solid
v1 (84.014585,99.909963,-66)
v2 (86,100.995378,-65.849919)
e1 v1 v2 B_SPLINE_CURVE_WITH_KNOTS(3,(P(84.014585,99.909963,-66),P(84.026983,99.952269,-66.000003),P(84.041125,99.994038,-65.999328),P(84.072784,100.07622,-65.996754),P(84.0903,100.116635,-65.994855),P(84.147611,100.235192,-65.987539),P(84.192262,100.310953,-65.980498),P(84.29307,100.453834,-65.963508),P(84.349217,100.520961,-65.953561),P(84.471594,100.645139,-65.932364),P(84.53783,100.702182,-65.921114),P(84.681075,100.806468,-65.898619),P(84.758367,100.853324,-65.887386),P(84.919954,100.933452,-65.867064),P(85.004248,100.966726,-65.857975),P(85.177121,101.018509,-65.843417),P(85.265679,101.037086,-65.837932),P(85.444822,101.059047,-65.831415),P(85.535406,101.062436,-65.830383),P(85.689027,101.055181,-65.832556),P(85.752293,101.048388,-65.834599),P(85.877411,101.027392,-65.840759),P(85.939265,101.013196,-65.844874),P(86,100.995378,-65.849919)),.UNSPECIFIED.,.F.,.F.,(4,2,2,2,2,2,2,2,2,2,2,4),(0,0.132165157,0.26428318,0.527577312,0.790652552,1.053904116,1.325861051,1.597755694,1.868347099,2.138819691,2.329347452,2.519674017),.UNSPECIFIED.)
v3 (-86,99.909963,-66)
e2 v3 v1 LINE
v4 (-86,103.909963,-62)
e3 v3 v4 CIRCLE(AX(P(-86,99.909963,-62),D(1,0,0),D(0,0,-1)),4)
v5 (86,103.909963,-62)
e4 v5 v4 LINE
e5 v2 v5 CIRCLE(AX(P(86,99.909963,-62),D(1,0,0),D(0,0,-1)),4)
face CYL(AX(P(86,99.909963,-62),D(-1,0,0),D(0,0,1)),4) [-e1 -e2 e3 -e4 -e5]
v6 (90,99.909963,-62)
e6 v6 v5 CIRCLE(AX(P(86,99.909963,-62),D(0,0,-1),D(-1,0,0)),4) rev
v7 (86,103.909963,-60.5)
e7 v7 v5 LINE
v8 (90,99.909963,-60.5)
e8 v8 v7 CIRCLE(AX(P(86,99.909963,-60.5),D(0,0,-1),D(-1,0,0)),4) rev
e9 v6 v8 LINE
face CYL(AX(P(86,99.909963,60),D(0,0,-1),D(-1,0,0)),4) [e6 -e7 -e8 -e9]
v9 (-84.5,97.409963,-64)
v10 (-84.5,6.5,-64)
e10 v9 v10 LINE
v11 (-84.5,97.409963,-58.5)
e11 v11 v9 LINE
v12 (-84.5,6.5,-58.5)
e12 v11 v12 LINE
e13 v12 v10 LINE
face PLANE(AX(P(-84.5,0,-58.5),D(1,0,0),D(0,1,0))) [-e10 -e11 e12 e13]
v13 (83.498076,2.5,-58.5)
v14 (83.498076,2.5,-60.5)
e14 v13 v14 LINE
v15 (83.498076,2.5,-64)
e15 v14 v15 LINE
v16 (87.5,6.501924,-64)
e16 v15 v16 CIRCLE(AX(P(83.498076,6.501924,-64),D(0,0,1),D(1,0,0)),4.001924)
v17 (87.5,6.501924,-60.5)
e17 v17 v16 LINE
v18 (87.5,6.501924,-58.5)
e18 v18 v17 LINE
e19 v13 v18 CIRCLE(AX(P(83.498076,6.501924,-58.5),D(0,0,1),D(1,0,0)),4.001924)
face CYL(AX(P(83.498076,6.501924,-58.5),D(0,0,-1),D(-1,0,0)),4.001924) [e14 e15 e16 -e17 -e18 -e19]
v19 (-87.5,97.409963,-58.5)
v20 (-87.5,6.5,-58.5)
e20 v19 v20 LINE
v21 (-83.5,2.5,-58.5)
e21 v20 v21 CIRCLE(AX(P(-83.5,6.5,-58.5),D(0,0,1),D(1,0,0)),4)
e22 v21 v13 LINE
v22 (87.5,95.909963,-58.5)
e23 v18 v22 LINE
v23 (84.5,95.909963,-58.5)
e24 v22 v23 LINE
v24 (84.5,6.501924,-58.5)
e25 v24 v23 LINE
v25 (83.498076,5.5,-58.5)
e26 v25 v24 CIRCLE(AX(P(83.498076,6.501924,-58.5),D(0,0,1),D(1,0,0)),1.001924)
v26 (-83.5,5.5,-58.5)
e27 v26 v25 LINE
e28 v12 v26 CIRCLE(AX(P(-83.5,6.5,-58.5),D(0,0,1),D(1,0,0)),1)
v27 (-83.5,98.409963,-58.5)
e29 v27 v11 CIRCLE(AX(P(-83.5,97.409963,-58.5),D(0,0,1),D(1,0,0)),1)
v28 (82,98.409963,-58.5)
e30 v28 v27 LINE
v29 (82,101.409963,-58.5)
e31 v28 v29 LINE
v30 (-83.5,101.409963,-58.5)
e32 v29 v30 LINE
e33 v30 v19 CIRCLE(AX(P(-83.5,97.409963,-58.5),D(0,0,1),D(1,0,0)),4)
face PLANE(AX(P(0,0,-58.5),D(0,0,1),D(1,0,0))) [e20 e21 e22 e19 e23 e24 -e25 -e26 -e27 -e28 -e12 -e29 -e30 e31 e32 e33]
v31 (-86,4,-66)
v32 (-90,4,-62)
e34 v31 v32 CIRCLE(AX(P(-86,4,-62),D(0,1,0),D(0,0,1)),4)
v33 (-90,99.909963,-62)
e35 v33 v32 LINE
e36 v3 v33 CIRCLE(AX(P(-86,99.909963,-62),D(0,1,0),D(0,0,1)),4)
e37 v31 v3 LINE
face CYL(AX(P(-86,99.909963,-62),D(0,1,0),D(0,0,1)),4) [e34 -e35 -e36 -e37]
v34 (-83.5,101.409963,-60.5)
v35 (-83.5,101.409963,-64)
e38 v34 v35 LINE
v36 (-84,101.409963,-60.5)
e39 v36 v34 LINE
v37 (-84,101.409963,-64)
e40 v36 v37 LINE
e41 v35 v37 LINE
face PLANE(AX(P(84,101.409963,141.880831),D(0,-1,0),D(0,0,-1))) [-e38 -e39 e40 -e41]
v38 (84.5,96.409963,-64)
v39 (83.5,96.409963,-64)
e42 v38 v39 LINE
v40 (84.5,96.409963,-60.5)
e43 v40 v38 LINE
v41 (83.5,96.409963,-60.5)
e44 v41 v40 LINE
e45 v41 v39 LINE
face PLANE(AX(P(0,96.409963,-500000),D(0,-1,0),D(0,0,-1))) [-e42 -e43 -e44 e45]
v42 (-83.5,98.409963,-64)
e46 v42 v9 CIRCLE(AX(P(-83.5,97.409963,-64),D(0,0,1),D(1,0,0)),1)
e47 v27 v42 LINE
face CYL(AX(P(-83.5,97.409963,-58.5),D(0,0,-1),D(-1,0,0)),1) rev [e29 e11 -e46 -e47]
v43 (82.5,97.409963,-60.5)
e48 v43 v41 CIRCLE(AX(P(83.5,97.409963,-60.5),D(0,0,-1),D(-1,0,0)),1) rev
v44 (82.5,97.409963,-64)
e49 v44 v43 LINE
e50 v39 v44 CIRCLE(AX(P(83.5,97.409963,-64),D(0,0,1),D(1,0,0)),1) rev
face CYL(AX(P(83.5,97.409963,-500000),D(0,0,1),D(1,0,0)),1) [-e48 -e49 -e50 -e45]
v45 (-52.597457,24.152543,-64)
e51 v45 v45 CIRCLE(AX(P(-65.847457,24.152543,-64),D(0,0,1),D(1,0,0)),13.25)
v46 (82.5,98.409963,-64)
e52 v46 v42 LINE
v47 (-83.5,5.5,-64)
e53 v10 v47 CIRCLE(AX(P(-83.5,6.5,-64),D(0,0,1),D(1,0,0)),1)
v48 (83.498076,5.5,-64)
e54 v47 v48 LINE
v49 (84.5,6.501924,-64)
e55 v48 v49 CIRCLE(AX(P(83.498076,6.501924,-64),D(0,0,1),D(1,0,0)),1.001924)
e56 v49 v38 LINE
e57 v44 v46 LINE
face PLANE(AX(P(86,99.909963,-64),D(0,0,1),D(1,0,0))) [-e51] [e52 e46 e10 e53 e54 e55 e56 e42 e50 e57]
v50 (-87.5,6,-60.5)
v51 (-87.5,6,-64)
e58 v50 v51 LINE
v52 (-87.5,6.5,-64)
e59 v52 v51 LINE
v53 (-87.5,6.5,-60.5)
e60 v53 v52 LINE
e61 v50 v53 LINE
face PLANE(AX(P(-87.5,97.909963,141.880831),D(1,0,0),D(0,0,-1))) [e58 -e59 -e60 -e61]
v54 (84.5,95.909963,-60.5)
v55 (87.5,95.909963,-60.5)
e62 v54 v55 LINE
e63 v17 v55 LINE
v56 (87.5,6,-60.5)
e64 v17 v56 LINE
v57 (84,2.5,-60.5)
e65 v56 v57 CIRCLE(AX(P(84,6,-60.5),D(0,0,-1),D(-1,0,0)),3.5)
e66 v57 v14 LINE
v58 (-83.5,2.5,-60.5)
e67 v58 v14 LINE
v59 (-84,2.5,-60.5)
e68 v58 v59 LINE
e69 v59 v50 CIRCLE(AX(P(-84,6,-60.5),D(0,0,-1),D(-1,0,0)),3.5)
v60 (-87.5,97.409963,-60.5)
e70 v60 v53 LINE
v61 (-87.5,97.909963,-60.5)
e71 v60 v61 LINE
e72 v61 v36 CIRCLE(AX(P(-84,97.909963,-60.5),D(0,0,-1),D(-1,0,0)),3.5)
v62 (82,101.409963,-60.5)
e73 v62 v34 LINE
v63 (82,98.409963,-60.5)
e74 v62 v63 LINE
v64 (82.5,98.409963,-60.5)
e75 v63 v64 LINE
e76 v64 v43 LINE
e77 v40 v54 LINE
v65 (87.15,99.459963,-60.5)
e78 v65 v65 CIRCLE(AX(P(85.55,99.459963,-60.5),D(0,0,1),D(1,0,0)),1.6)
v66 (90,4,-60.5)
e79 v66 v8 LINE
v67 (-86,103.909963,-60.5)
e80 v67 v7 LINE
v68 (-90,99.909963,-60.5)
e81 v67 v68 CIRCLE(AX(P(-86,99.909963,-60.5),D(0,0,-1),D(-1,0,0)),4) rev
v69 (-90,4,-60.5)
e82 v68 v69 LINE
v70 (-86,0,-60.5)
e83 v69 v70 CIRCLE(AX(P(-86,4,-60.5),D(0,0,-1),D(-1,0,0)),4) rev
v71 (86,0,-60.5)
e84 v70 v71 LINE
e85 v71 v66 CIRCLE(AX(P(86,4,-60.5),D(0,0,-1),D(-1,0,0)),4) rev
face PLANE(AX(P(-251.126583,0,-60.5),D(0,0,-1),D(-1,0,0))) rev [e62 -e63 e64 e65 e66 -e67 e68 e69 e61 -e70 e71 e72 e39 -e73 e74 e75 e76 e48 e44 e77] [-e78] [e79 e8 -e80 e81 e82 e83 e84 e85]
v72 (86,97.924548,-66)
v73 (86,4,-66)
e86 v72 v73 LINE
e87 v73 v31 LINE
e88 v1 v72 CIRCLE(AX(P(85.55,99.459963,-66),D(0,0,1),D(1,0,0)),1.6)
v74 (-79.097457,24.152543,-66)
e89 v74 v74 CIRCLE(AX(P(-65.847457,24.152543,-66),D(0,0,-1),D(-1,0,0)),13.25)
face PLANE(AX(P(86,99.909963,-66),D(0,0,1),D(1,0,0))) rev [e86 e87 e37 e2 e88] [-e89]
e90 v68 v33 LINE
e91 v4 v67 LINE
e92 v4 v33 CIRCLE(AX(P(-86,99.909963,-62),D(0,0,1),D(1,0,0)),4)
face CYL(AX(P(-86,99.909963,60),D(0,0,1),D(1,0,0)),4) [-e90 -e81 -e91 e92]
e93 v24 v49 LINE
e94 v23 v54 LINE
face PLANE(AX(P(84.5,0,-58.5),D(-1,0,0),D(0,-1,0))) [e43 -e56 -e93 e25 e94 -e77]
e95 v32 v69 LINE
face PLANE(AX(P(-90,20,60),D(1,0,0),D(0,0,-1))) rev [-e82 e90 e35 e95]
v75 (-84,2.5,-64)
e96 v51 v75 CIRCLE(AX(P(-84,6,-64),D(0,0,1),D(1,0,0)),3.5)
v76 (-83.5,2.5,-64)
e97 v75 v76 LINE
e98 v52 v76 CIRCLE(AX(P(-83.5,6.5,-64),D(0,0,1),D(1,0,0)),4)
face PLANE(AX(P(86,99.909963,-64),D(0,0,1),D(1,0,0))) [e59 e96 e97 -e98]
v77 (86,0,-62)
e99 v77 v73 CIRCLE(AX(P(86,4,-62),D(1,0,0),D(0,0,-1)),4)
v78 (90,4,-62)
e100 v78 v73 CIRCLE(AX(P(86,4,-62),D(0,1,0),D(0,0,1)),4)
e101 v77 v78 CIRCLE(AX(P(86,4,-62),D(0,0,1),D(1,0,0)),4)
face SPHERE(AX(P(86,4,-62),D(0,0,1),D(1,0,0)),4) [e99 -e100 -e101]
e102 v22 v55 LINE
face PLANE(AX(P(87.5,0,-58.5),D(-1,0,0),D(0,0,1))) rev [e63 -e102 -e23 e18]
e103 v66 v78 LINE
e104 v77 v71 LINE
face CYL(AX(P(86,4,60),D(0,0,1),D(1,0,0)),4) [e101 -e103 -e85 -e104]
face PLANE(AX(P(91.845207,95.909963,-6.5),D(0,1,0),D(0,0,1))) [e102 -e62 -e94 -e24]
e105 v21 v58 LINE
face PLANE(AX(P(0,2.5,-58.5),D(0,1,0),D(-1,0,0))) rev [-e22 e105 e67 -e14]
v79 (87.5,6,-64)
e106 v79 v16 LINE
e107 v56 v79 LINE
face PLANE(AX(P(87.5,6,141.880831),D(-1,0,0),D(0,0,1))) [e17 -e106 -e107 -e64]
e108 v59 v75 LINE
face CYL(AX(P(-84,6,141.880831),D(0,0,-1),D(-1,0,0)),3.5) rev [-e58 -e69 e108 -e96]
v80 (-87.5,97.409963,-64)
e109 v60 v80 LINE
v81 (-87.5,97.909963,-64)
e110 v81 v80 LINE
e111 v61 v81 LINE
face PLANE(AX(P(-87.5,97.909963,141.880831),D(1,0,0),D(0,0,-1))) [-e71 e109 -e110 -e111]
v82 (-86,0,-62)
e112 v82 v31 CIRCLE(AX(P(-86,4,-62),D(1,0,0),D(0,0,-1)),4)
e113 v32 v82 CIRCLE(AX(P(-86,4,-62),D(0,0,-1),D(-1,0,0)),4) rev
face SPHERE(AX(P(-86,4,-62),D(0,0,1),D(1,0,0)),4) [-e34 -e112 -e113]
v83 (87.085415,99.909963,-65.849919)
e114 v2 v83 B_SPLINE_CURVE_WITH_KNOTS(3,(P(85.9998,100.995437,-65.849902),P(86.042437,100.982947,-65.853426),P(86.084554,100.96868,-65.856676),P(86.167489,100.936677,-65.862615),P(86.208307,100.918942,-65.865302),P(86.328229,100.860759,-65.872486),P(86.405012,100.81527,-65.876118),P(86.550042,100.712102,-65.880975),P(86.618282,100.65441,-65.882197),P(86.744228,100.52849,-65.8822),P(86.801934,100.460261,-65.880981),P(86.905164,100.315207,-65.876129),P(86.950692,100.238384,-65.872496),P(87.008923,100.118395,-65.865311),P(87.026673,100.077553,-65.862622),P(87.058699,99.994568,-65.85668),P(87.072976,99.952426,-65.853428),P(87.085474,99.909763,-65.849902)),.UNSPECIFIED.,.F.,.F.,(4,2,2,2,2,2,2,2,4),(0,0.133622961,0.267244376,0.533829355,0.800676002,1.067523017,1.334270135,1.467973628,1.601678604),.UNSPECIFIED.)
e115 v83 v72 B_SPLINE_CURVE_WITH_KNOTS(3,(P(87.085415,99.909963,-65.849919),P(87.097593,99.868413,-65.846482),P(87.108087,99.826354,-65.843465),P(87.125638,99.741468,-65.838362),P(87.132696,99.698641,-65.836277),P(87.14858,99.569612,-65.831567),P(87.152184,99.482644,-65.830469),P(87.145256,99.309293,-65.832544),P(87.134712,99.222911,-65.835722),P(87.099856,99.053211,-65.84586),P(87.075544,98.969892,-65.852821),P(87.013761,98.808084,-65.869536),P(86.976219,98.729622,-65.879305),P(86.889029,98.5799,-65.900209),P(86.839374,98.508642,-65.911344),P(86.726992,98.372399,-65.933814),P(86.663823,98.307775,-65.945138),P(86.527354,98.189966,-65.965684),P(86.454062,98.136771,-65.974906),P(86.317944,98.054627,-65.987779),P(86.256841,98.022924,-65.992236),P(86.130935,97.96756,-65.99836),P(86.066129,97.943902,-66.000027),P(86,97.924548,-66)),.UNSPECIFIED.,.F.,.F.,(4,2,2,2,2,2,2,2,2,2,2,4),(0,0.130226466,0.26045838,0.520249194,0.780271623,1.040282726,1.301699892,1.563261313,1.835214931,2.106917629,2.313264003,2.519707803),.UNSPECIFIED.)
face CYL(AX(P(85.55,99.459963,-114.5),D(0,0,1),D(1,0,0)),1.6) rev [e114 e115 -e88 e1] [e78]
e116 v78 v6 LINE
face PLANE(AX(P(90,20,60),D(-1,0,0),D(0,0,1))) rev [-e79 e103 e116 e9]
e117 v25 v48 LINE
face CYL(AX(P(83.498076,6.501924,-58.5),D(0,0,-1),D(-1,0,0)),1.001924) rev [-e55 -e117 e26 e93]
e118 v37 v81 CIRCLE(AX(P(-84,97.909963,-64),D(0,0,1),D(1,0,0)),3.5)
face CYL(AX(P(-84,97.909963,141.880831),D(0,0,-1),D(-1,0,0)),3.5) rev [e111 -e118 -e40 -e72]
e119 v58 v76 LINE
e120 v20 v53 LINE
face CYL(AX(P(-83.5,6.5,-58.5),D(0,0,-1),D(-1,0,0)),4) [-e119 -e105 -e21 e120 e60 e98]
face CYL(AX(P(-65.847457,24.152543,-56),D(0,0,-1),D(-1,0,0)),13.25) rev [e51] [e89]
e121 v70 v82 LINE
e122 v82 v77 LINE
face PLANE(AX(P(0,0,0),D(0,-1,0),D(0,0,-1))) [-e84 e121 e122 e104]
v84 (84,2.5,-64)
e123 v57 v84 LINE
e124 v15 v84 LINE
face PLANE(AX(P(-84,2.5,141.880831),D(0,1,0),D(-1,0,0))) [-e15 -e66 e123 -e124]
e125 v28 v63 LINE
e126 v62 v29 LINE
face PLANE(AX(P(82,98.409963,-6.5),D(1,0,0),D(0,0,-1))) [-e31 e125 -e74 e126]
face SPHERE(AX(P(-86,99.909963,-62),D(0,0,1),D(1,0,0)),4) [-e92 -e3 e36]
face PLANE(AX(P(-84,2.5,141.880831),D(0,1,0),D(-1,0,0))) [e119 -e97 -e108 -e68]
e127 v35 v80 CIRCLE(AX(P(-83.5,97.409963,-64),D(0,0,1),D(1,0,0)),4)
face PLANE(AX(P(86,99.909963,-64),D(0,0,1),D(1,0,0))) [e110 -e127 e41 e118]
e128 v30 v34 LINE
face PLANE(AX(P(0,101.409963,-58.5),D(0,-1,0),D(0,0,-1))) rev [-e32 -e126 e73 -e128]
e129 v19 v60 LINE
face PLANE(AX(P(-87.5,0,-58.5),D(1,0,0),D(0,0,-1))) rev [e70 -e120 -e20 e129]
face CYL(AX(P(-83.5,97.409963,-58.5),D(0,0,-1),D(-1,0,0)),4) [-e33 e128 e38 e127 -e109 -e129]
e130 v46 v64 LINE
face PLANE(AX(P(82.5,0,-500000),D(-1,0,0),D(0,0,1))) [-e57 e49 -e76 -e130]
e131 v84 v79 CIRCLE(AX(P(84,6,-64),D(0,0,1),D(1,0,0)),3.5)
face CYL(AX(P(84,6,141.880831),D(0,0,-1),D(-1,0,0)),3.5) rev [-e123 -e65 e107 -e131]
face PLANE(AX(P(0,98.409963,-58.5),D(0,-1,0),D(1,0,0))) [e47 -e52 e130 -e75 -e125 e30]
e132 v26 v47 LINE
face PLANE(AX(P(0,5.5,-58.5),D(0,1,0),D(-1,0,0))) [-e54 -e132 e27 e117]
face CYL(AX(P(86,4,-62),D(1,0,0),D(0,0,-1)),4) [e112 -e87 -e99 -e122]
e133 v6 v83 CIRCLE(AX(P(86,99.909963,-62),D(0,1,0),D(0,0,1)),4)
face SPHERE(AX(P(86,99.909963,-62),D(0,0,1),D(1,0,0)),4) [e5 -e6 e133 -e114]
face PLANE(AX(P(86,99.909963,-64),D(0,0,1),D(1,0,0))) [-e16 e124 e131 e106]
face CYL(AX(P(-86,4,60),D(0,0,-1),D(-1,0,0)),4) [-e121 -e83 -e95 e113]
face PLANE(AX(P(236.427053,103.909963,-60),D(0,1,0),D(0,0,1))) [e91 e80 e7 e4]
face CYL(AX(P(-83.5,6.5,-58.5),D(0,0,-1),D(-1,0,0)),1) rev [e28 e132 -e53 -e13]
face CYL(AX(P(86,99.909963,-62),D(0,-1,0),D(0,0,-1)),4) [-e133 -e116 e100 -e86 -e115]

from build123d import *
from OCP.BRepFilletAPI import BRepFilletAPI_MakeChamfer

# Parameters (mm, degrees)
SKETCH1_W            = 180
SKETCH1_H            = 120
BOSS_EXTRUDE1_DEPTH  = 20
BOSS_EXTRUDE2_DEPTH  = 180
SHELL3_T             = -2
FILLET1_R            = 4
FILLET2_R            = 4
BOSS_EXTRUDE3_DEPTH  = 2.5
SKETCH14_R           = 1.6
CUT_EXTRUDE10_DEPTH  = 3.2
CUT_EXTRUDE3_REACH   = 151.991
SKETCH7_W            = 14
SKETCH7_H            = 9
SKETCH8_R            = 1.35
BOSS_EXTRUDE4_DEPTH  = 5
SKETCH8_3_W          = 97.5
SKETCH8_3_H          = 40.5
CUT_EXTRUDE4_DEPTH   = 5
SKETCH9_W            = 50.8
SKETCH9_H            = 19.5
CUT_EXTRUDE5_DEPTH   = 5
SKETCH10_R           = 2.525
CUT_EXTRUDE6_DEPTH   = 5
SKETCH11_R           = 6.125
CUT_EXTRUDE7_DEPTH   = 5
CUT_EXTRUDE8_DEPTH   = 5
FILLET4_R            = 1.5
SKETCH13_W           = 22
SKETCH13_H           = 10
CUT_EXTRUDE9_DEPTH   = 5
CHAMFER1_SIZE        = 9.330127019
CHAMFER1_SIZE_2      = 2.5
SKETCH15_W           = 9
SKETCH15_H           = 14
CUT_EXTRUDE11_DEPTH  = 3.2
SKETCH16_R           = 3.5
CUT_EXTRUDE12_DEPTH  = 3.2
SKETCH17_R           = 7
SKETCH17_R_2         = 6
BOSS_EXTRUDE5_DEPTH  = 0.5
FILLET7_R            = 0.5
CUT_EXTRUDE13_DEPTH  = 1
FILLET8_R            = 1
SKETCH19_W           = 7.5
SKETCH19_H           = 5.2
SKETCH19_W_2         = 6.5
SKETCH19_H_2         = 6.5
CUT_EXTRUDE14_DEPTH  = 1.2
BOSS_EXTRUDE6_START  = 4
BOSS_EXTRUDE6_DEPTH  = 4
BOSS_EXTRUDE7_START  = 2
BOSS_EXTRUDE7_DEPTH  = 2
FILLET9_R            = 4
CUT_EXTRUDE18_REACH  = 220.067
BOSS_EXTRUDE8_DEPTH  = 3.5
BOSS_EXTRUDE10_DEPTH = 5.5
BOSS_EXTRUDE12_START = -3.5
BOSS_EXTRUDE12_DEPTH = 3.5
CUT_EXTRUDE21_DEPTH  = 54
SKETCH31_R           = 1.6
CUT_EXTRUDE22_DEPTH  = 54
FILLET11_R           = 1
SKETCH32_R           = 13.25
CUT_EXTRUDE23_DEPTH  = 10


# Read off the part's stored shape, not the designer's step: Boss-Extrude12
with BuildPart() as part:
    # Sketch1 → Boss-Extrude1 (new body)
    with BuildSketch(Plane(origin=(0, 0, 0), x_dir=(1, 0, 0), z_dir=(0, 1, 0))):
        Rectangle(SKETCH1_W, SKETCH1_H)
    extrude(amount=BOSS_EXTRUDE1_DEPTH)

    # Sketch2 → Boss-Extrude2 (add)
    with BuildSketch(Plane.ZY.offset(90)):
        Polygon((60, 20), (-40, 103.909963118), (-60, 103.909963118), (-60, 20), align=None)
    extrude(amount=-BOSS_EXTRUDE2_DEPTH)

    # Shell3
    shell3_openings = [part.faces().sort_by_distance(p)[0] for p in [
        (0, 51.954981559, -60),
    ]]
    offset(amount=SHELL3_T, openings=shell3_openings, kind=Kind.INTERSECTION)

    # Fillet1
    fillet1_edges = [part.edges().sort_by_distance(p)[0] for p in [
        (0, 20, 60),
        (0, 103.909963118, -40),
        (-90, 61.954981559, 10),
        (-90, 103.909963118, -50),
        (90, 103.909963118, -50),
        (90, 61.954981559, 10),
        (0, 0, 60),
        (-90, 0, 0),
        (90, 0, 0),
        (90, 10, 60),
        (-90, 10, 60),
    ]]
    fillet(fillet1_edges, radius=FILLET1_R)

    # Fillet2
    fillet2_edges = [part.edges().sort_by_distance(p)[0] for p in [
        (88, 2, -1),
        (88, 101.909963118, -50.363970234),
        (88, 60.488673901, 8.636029766),
        (88, 10.533692342, 58),
        (-88, 2, -1),
        (-88, 60.488673901, 8.636029766),
        (-88, 101.909963118, -50.363970234),
        (0, 2, 58),
        (-88, 10.533692342, 58),
        (0, 101.909963118, -40.727940469),
        (0, 19.067384684, 58),
    ]]
    fillet(fillet2_edges, radius=FILLET2_R)

    # Sketch4 → Boss-Extrude3 (add)
    with BuildSketch(Plane(origin=(0, 2, 0), x_dir=(1, 0, 0), z_dir=(0, 1, 0))):
        Polygon((34.175426481, -3.50047313), (32.58771324, -0.75047313), (29.41228676, -0.75047313), (27.824573519, -3.50047313), (29.41228676, -6.25047313), (32.58771324, -6.25047313), align=None)
        Polygon((32.58771324, 41.24952687), (34.175426481, 38.49952687), (32.58771324, 35.74952687), (29.41228676, 35.74952687), (27.824573519, 38.49952687), (29.41228676, 41.24952687), align=None)
        Polygon((-29.41228676, 41.24952687), (-32.58771324, 41.24952687), (-34.175426481, 38.49952687), (-32.58771324, 35.74952687), (-29.41228676, 35.74952687), (-27.824573519, 38.49952687), align=None)
        Polygon((-32.58771324, -6.25047313), (-34.175426481, -3.50047313), (-32.58771324, -0.75047313), (-29.41228676, -0.75047313), (-27.824573519, -3.50047313), (-29.41228676, -6.25047313), align=None)
    extrude(amount=BOSS_EXTRUDE3_DEPTH)

    # Sketch14 → Cut-Extrude10 (cut)
    with BuildSketch(Plane(origin=(0, 4.5, 0), x_dir=(1, 0, 0), z_dir=(0, 1, 0))):
        with Locations(Location((31, 38.49952687, 0), (0, 0, 270))):
            Circle(SKETCH14_R)
        with Locations(Location((-31, -3.50047313, 0), (0, 0, 90))):
            Circle(SKETCH14_R)
        with Locations(Location((-31, 38.49952687, 0), (0, 0, 270))):
            Circle(SKETCH14_R)
        with Locations(Location((31, -3.50047313, 0), (0, 0, 270))):
            Circle(SKETCH14_R)
    extrude(amount=-CUT_EXTRUDE10_DEPTH, mode=Mode.SUBTRACT)

    # Sketch7 → Cut-Extrude3 (cut, up to next)
    with BuildSketch(Plane(origin=(0, 103.909963118, 0), x_dir=(1, 0, 0), z_dir=(0, 1, 0)), mode=Mode.PRIVATE) as cut_extrude3_sk1:
        with Locations((-63, 50.727940469)):
            Rectangle(SKETCH7_W, SKETCH7_H)
    cut_extrude3_tool1 = extrude(cut_extrude3_sk1.sketch, amount=-CUT_EXTRUDE3_REACH, mode=Mode.PRIVATE) & part.part
    add(cut_extrude3_tool1.solids().sort_by_distance((-63, 103.909963, -50.72794))[0], mode=Mode.SUBTRACT)

    # Sketch8 → Boss-Extrude4 (add)
    with BuildSketch(Plane(origin=(0, 41.280714367, 34.6386322), x_dir=(1, 0, 0), z_dir=(0, 0.766044443118982, 0.6427876096865347))):
        with Locations(Location((-73.5, 93.477933603, 0), (0, 0, 270))):
            Circle(SKETCH8_R)
        with Locations(Location((-73.5, 37.977933603, 0), (0, 0, 270))):
            Circle(SKETCH8_R)
        with Locations(Location((19, 37.977933603, 0), (0, 0, 270))):
            Circle(SKETCH8_R)
        with Locations(Location((19, 93.477933603, 0), (0, 0, 270))):
            Circle(SKETCH8_R)
    extrude(amount=-BOSS_EXTRUDE4_DEPTH)

    # Sketch8<3> → Cut-Extrude4 (cut)
    with BuildSketch(Plane(origin=(0, 41.280714367, 34.6386322), x_dir=(1, 0, 0), z_dir=(0, 0.766044443118982, 0.6427876096865347))):
        with Locations((-27.25, 65.727933603)):
            Rectangle(SKETCH8_3_W, SKETCH8_3_H)
    extrude(amount=-CUT_EXTRUDE4_DEPTH, mode=Mode.SUBTRACT)

    # Sketch9 → Cut-Extrude5 (cut)
    with BuildSketch(Plane(origin=(0, 41.280714367, 34.6386322), x_dir=(1, 0, 0), z_dir=(0, 0.766044443118982, 0.6427876096865347))):
        with Locations((-50.6, 20.727933603)):
            Rectangle(SKETCH9_W, SKETCH9_H)
    extrude(amount=-CUT_EXTRUDE5_DEPTH, mode=Mode.SUBTRACT)

    # Sketch10 → Cut-Extrude6 (cut)
    with BuildSketch(Plane(origin=(0, 41.280714367, 34.6386322), x_dir=(1, 0, 0), z_dir=(0, 0.766044443118982, 0.6427876096865347))):
        with Locations(Location((-13.525, 20.727933603, 0), (0, 0, 270))):
            Circle(SKETCH10_R)
        with Locations(Location((-1.85, 20.727933603, 0), (0, 0, 270))):
            Circle(SKETCH10_R)
        with Locations(Location((9.825, 20.727933603, 0), (0, 0, 270))):
            Circle(SKETCH10_R)
    extrude(amount=-CUT_EXTRUDE6_DEPTH, mode=Mode.SUBTRACT)

    # Sketch11 → Cut-Extrude7 (cut)
    with BuildSketch(Plane(origin=(0, 41.280714367, 34.6386322), x_dir=(1, 0, 0), z_dir=(0, 0.766044443118982, 0.6427876096865347))):
        with Locations(Location((37.625, 60.977933603, 0), (0, 0, 270))):
            Circle(SKETCH11_R)
        with BuildLine():
            ThreePointArc((76, 60.977933603), (74.206029035, 65.308962638), (69.875, 67.102933603))
            Line((69.875, 67.102933603), (69.875, 54.852933603))
            ThreePointArc((69.875, 54.852933603), (74.206029035, 56.646904568), (76, 60.977933603))
        make_face()
        with BuildLine():
            Line((69.875, 54.852933603), (69.875, 67.102933603))
            ThreePointArc((69.875, 67.102933603), (63.75, 60.977933603), (69.875, 54.852933603))
        make_face()
    extrude(amount=-CUT_EXTRUDE7_DEPTH, mode=Mode.SUBTRACT)

    # Sketch12 → Cut-Extrude8 (cut)
    with BuildSketch(Plane(origin=(0, 41.280714367, 34.6386322), x_dir=(1, 0, 0), z_dir=(0, 0.766044443118982, 0.6427876096865347))):
        with BuildLine():
            ThreePointArc((-76, -10.131875079), (-66, -20.131875079), (-56, -10.131875079))
            Line((-56, -10.131875079), (-76, -10.131875079))
        make_face()
        with BuildLine():
            Line((-76, -10.131875079), (-56, -10.131875079))
            ThreePointArc((-56, -10.131875079), (-66, -0.131875079), (-76, -10.131875079))
        make_face()
        with BuildLine():
            ThreePointArc((-25.2, -10.131875079), (-35.2, -0.131875079), (-45.2, -10.131875079))
            Line((-45.2, -10.131875079), (-25.2, -10.131875079))
        make_face()
        with BuildLine():
            Line((-25.2, -10.131875079), (-45.2, -10.131875079))
            ThreePointArc((-45.2, -10.131875079), (-35.2, -20.131875079), (-25.2, -10.131875079))
        make_face()
    extrude(amount=-CUT_EXTRUDE8_DEPTH, mode=Mode.SUBTRACT)

    # Fillet4
    fillet4_edges = [part.edges().sort_by_distance(p)[0] for p in [
        (-45.2, 33.235981717, 41.114523583),
        (-76, 33.235981717, 41.114523583),
    ]]
    fillet(fillet4_edges, radius=FILLET4_R)

    # Sketch13 → Cut-Extrude9 (cut)
    with BuildSketch(Plane(origin=(0, 41.280714367, 34.6386322), x_dir=(1, 0, 0), z_dir=(0, 0.766044443118982, 0.6427876096865347))):
        with Locations((-1.85, -0.131875079)):
            Rectangle(SKETCH13_W, SKETCH13_H)
        with Locations((-1.85, -20.131875079)):
            Rectangle(SKETCH13_W, SKETCH13_H)
    extrude(amount=-CUT_EXTRUDE9_DEPTH, mode=Mode.SUBTRACT)

    # Chamfer1
    chamfer1_edges_1 = [part.edges().sort_by_distance(p)[0] for p in [
        (-28.61843014, 2, 4.87547313),
    ]]
    chamfer1_side_1 = [part.faces().sort_by_distance(p)[0] for p in [
        (-28.575128869, 2, 4.90047313),
    ]]
    chamfer1_edges_2 = [part.edges().sort_by_distance(p)[0] for p in [
        (-31, 2, 6.25047313),
    ]]
    chamfer1_side_2 = [part.faces().sort_by_distance(p)[0] for p in [
        (-31, 2, 6.30047313),
    ]]
    chamfer1_edges_3 = [part.edges().sort_by_distance(p)[0] for p in [
        (-33.38156986, 2, 4.87547313),
    ]]
    chamfer1_side_3 = [part.faces().sort_by_distance(p)[0] for p in [
        (-33.424871131, 2, 4.90047313),
    ]]
    chamfer1_edges_4 = [part.edges().sort_by_distance(p)[0] for p in [
        (-33.38156986, 2, -37.12452687),
    ]]
    chamfer1_side_4 = [part.faces().sort_by_distance(p)[0] for p in [
        (-33.424871131, 2, -37.09952687),
    ]]
    chamfer1_edges_5 = [part.edges().sort_by_distance(p)[0] for p in [
        (-31, 2, -35.74952687),
    ]]
    chamfer1_side_5 = [part.faces().sort_by_distance(p)[0] for p in [
        (-31, 2, -35.69952687),
    ]]
    chamfer1_edges_6 = [part.edges().sort_by_distance(p)[0] for p in [
        (-28.61843014, 2, -37.12452687),
    ]]
    chamfer1_side_6 = [part.faces().sort_by_distance(p)[0] for p in [
        (-28.575128869, 2, -37.09952687),
    ]]
    chamfer1_edges_7 = [part.edges().sort_by_distance(p)[0] for p in [
        (28.61843014, 2, -37.12452687),
    ]]
    chamfer1_side_7 = [part.faces().sort_by_distance(p)[0] for p in [
        (28.575128869, 2, -37.09952687),
    ]]
    chamfer1_edges_8 = [part.edges().sort_by_distance(p)[0] for p in [
        (31, 2, -35.74952687),
    ]]
    chamfer1_side_8 = [part.faces().sort_by_distance(p)[0] for p in [
        (31, 2, -35.69952687),
    ]]
    chamfer1_edges_9 = [part.edges().sort_by_distance(p)[0] for p in [
        (33.38156986, 2, -37.12452687),
    ]]
    chamfer1_side_9 = [part.faces().sort_by_distance(p)[0] for p in [
        (33.424871131, 2, -37.09952687),
    ]]
    chamfer1_edges_10 = [part.edges().sort_by_distance(p)[0] for p in [
        (33.38156986, 2, 4.87547313),
    ]]
    chamfer1_side_10 = [part.faces().sort_by_distance(p)[0] for p in [
        (33.424871131, 2, 4.90047313),
    ]]
    chamfer1_edges_11 = [part.edges().sort_by_distance(p)[0] for p in [
        (28.61843014, 2, 4.87547313),
    ]]
    chamfer1_side_11 = [part.faces().sort_by_distance(p)[0] for p in [
        (28.575128869, 2, 4.90047313),
    ]]
    chamfer1_edges_12 = [part.edges().sort_by_distance(p)[0] for p in [
        (31, 2, 6.25047313),
    ]]
    chamfer1_side_12 = [part.faces().sort_by_distance(p)[0] for p in [
        (31, 2, 6.30047313),
    ]]
    chamfer1 = BRepFilletAPI_MakeChamfer(part.part.solid().wrapped)
    for e in chamfer1_edges_1:
        chamfer1.Add(CHAMFER1_SIZE - 0.0001, CHAMFER1_SIZE_2 - 0.0001, e.wrapped, chamfer1_side_1[0].wrapped)
    for e in chamfer1_edges_2:
        chamfer1.Add(CHAMFER1_SIZE - 0.0001, CHAMFER1_SIZE_2 - 0.0001, e.wrapped, chamfer1_side_2[0].wrapped)
    for e in chamfer1_edges_3:
        chamfer1.Add(CHAMFER1_SIZE - 0.0001, CHAMFER1_SIZE_2 - 0.0001, e.wrapped, chamfer1_side_3[0].wrapped)
    for e in chamfer1_edges_4:
        chamfer1.Add(CHAMFER1_SIZE - 0.0001, CHAMFER1_SIZE_2 - 0.0001, e.wrapped, chamfer1_side_4[0].wrapped)
    for e in chamfer1_edges_5:
        chamfer1.Add(CHAMFER1_SIZE - 0.0001, CHAMFER1_SIZE_2 - 0.0001, e.wrapped, chamfer1_side_5[0].wrapped)
    for e in chamfer1_edges_6:
        chamfer1.Add(CHAMFER1_SIZE - 0.0001, CHAMFER1_SIZE_2 - 0.0001, e.wrapped, chamfer1_side_6[0].wrapped)
    for e in chamfer1_edges_7:
        chamfer1.Add(CHAMFER1_SIZE - 0.0001, CHAMFER1_SIZE_2 - 0.0001, e.wrapped, chamfer1_side_7[0].wrapped)
    for e in chamfer1_edges_8:
        chamfer1.Add(CHAMFER1_SIZE - 0.0001, CHAMFER1_SIZE_2 - 0.0001, e.wrapped, chamfer1_side_8[0].wrapped)
    for e in chamfer1_edges_9:
        chamfer1.Add(CHAMFER1_SIZE - 0.0001, CHAMFER1_SIZE_2 - 0.0001, e.wrapped, chamfer1_side_9[0].wrapped)
    for e in chamfer1_edges_10:
        chamfer1.Add(CHAMFER1_SIZE - 0.0001, CHAMFER1_SIZE_2 - 0.0001, e.wrapped, chamfer1_side_10[0].wrapped)
    for e in chamfer1_edges_11:
        chamfer1.Add(CHAMFER1_SIZE - 0.0001, CHAMFER1_SIZE_2 - 0.0001, e.wrapped, chamfer1_side_11[0].wrapped)
    for e in chamfer1_edges_12:
        chamfer1.Add(CHAMFER1_SIZE - 0.0001, CHAMFER1_SIZE_2 - 0.0001, e.wrapped, chamfer1_side_12[0].wrapped)
    add(Compound.cast(chamfer1.Shape()), mode=Mode.REPLACE)  # a hair under: the kernel refuses the full size

    # Sketch15 → Cut-Extrude11 (cut)
    with BuildSketch(Plane(origin=(0, 41.280714367, 34.6386322), x_dir=(1, 0, 0), z_dir=(0, 0.766044443118982, 0.6427876096865347))):
        with Locations((69.812284425, 22.683898911)):
            Rectangle(SKETCH15_W, SKETCH15_H)
        with Locations((53.870194494, 22.738966801)):
            Rectangle(SKETCH15_W, SKETCH15_H)
        with Locations((37.689197041, 22.832961961)):
            Rectangle(SKETCH15_W, SKETCH15_H)
    extrude(amount=-CUT_EXTRUDE11_DEPTH, mode=Mode.SUBTRACT)

    # Sketch16 → Cut-Extrude12 (cut)
    with BuildSketch(Plane(origin=(0, 41.280714367, 34.6386322), x_dir=(1, 0, 0), z_dir=(0, 0.766044443118982, 0.6427876096865347))):
        with Locations(Location((66.7875, -10.131875079, 0), (0, 0, 270))):
            Circle(SKETCH16_R)
        with Locations(Location((28.150317304, -10.131875079, 0), (0, 0, 270))):
            Circle(SKETCH16_R)
        with Locations(Location((47.575, -10.131875079, 0), (0, 0, 270))):
            Circle(SKETCH16_R)
    extrude(amount=-CUT_EXTRUDE12_DEPTH, mode=Mode.SUBTRACT)

    # Sketch17 → Boss-Extrude5 (add)
    # profile 1 of 4: a face of its own
    with BuildSketch(Plane.XZ):
        with Locations(Location((-78.221825407, 48.221825407, 0), (0, 0, 270))):
            Circle(SKETCH17_R)
        with Locations(Location((-78.221825407, 48.221825407, 0), (0, 0, 270))):
            Circle(SKETCH17_R_2, mode=Mode.SUBTRACT)
    # profile 2 of 4: a face of its own
    with BuildSketch(Plane.XZ):
        with Locations(Location((78.221825407, 48.221825407, 0), (0, 0, 270))):
            Circle(SKETCH17_R)
        with Locations(Location((78.221825407, 48.221825407, 0), (0, 0, 270))):
            Circle(SKETCH17_R_2, mode=Mode.SUBTRACT)
    # profile 3 of 4: a face of its own
    with BuildSketch(Plane.XZ):
        with Locations(Location((78.221825407, -51.278809632, 0), (0, 0, 270))):
            Circle(SKETCH17_R)
        with Locations(Location((78.221825407, -51.278809632, 0), (0, 0, 270))):
            Circle(SKETCH17_R_2, mode=Mode.SUBTRACT)
    # profile 4 of 4: a face of its own
    with BuildSketch(Plane.XZ):
        with Locations(Location((-78.221825407, -51.278809632, 0), (0, 0, 270))):
            Circle(SKETCH17_R)
        with Locations(Location((-78.221825407, -51.278809632, 0), (0, 0, 270))):
            Circle(SKETCH17_R_2, mode=Mode.SUBTRACT)
    extrude(amount=BOSS_EXTRUDE5_DEPTH)

    # Fillet7
    fillet7_edges = [part.edges().sort_by_distance(p)[0] for p in [
        (78.221825407, -0.5, -45.278809632),
        (78.221825407, -0.5, -44.278809632),
        (78.221825407, -0.5, 55.221825407),
        (78.221825407, -0.5, 54.221825407),
        (-78.221825407, -0.5, 54.221825407),
        (-78.221825407, -0.5, 55.221825407),
        (-78.221825407, -0.5, -44.278809632),
        (-78.221825407, -0.5, -45.278809632),
    ]]
    fillet(fillet7_edges, radius=FILLET7_R - 0.0001)  # a hair under: the kernel refuses the full size

    # Sketch18 → Cut-Extrude13 (cut)
    with BuildSketch(Plane.XZ.offset(-101.909963118)):
        Polygon((-51, -58), (79, -58), (79, -44.183821406), (-51, -44.183821406), (-51, -50.727940469), align=None)
    extrude(amount=-CUT_EXTRUDE13_DEPTH, mode=Mode.SUBTRACT)

    # Fillet8
    fillet8_edges = [part.edges().sort_by_distance(p)[0] for p in [
        (-51, 102.909963118, -51.091910703),
        (14, 102.909963118, -44.183821406),
        (79, 102.909963118, -51.091910703),
        (14, 102.909963118, -58),
    ]]
    fillet(fillet8_edges, radius=FILLET8_R - 0.0001)  # a hair under: the kernel refuses the full size

    # Sketch19 → Cut-Extrude14 (cut)
    with BuildSketch(Plane(origin=(0, 103.909963118, 0), x_dir=(1, 0, 0), z_dir=(0, 1, 0))):
        with Locations((-42.25, 50.727940469)):
            Rectangle(SKETCH19_W, SKETCH19_H)
        with Locations((-32.25, 50.727940469)):
            Rectangle(SKETCH19_W_2, SKETCH19_H_2)
        Polygon((-14, 50.727940469), (-14, 53.227940469), (74.4, 53.227940469), (74.4, 48.227940469), (-14, 48.227940469), align=None)
    extrude(amount=-CUT_EXTRUDE14_DEPTH, mode=Mode.SUBTRACT)

    # Sketch20 → Boss-Extrude6 (add)
    with BuildSketch(Plane(origin=(0, 0, -60), x_dir=(-1, 0, 0), z_dir=(0, 0, -1)).offset(BOSS_EXTRUDE6_START)):
        with BuildLine():
            Line((-86, 103.909963118), (86, 103.909963118))
            ThreePointArc((86, 103.909963118), (88.828427125, 102.738390242), (90, 99.909963118))
            Line((90, 99.909963118), (90, 4))
            ThreePointArc((90, 4), (88.828427125, 1.171572875), (86, 0))
            Line((86, 0), (-86, 0))
            ThreePointArc((-86, 0), (-88.828427125, 1.171572875), (-90, 4))
            Line((-90, 4), (-90, 99.909963118))
            ThreePointArc((-90, 99.909963118), (-88.828427125, 102.738390242), (-86, 103.909963118))
        make_face()
        with BuildLine():
            Line((-88, 97.909963118), (-88, 6))
            ThreePointArc((-88, 6), (-86.828427125, 3.171572875), (-84, 2))
            Line((-84, 2), (84, 2))
            ThreePointArc((84, 2), (86.828427125, 3.171572875), (88, 6))
            Line((88, 6), (88, 97.909963118))
            ThreePointArc((88, 97.909963118), (86.828427125, 100.738390242), (84, 101.909963118))
            Line((84, 101.909963118), (-84, 101.909963118))
            ThreePointArc((-84, 101.909963118), (-86.828427125, 100.738390242), (-88, 97.909963118))
        make_face(mode=Mode.SUBTRACT)
    extrude(amount=-BOSS_EXTRUDE6_DEPTH)

    # Sketch23 → Boss-Extrude7 (add)
    with BuildSketch(Plane(origin=(0, 0, -64), x_dir=(-1, 0, 0), z_dir=(0, 0, -1)).offset(BOSS_EXTRUDE7_START)):
        with BuildLine():
            Line((-86, 103.909963118), (86, 103.909963118))
            ThreePointArc((86, 103.909963118), (88.828427125, 102.738390242), (90, 99.909963118))
            Line((90, 99.909963118), (90, 4))
            ThreePointArc((90, 4), (88.828427125, 1.171572875), (86, 0))
            Line((86, 0), (-86, 0))
            ThreePointArc((-86, 0), (-88.828427125, 1.171572875), (-90, 4))
            Line((-90, 4), (-90, 99.909963118))
            ThreePointArc((-90, 99.909963118), (-88.828427125, 102.738390242), (-86, 103.909963118))
        make_face()
    extrude(amount=-BOSS_EXTRUDE7_DEPTH)

    # Fillet9
    fillet9_edges = [part.edges().sort_by_distance(p)[0] for p in [
        (88.828427125, 102.738390242, -66),
        (90, 51.954981559, -66),
        (88.828427125, 1.171572875, -66),
        (0, 0, -66),
        (-88.828427125, 1.171572875, -66),
        (-90, 51.954981559, -66),
        (-88.828427125, 102.738390242, -66),
        (0, 103.909963118, -66),
    ]]
    fillet(fillet9_edges, radius=FILLET9_R)

    # Cut-Extrude18: up to this face of the body (flat: up to its plane)
    cut_extrude18_end = Plane(part.part.faces().sort_by_distance((-90, 40.707947671, -17.408745232))[0])
    # Sketch25 → Cut-Extrude18 (cut, up to the picked face)
    with BuildSketch(Plane(origin=(90, 0, 0), x_dir=(0, 0, -1), z_dir=(1, 0, 0)), mode=Mode.PRIVATE) as cut_extrude18_sk1:
        Polygon((60.5, 103.909963118), (41.455880937, 103.909963118), (38.505766569, 103.909963118), (38.884730498, 102.97414089), (-58.571150439, 21.19894714), (-60.532827399, 20.404560357), (-60, 18.134769367), (-60, 4), (-60.2664137, 0), (-56.570989921, -1.575749733), (-39.460910692, -1.575749733), (-38.789002037, 0), (46.546103456, -2.451826891), (60.5, -1.899548411), (60.5, 0.282012763), align=None)
    cut_extrude18_tool1 = split(extrude(cut_extrude18_sk1.sketch, amount=-CUT_EXTRUDE18_REACH, mode=Mode.PRIVATE), bisect_by=cut_extrude18_end, keep=Keep.BOTH, mode=Mode.PRIVATE)
    add(cut_extrude18_tool1.solids().sort_by(Axis((90, 39.075645, -13.771373), (-1, 0, 0)))[0], mode=Mode.SUBTRACT)

    # Sketch26 → Boss-Extrude8 (add)
    with BuildSketch(Plane.XY.offset(-64)):
        with BuildLine():
            Line((-88, 97.909963118), (-88, 6))
            ThreePointArc((-88, 6), (-86.828427125, 3.171572875), (-84, 2))
            Line((-84, 2), (84, 2))
            ThreePointArc((84, 2), (86.828427125, 3.171572875), (88, 6))
            Line((88, 6), (88, 97.909963118))
            ThreePointArc((88, 97.909963118), (86.828427125, 100.738390242), (84, 101.909963118))
            Line((84, 101.909963118), (-84, 101.909963118))
            ThreePointArc((-84, 101.909963118), (-86.828427125, 100.738390242), (-88, 97.909963118))
        make_face()
        with BuildLine():
            Line((84, 101.409963118), (-84, 101.409963118))
            ThreePointArc((-84, 101.409963118), (-86.474873734, 100.384836852), (-87.5, 97.909963118))
            Line((-87.5, 97.909963118), (-87.5, 6))
            ThreePointArc((-87.5, 6), (-86.474873734, 3.525126266), (-84, 2.5))
            Line((-84, 2.5), (84, 2.5))
            ThreePointArc((84, 2.5), (86.474873734, 3.525126266), (87.5, 6))
            Line((87.5, 6), (87.5, 97.909963118))
            ThreePointArc((87.5, 97.909963118), (86.474873734, 100.384836852), (84, 101.409963118))
        make_face(mode=Mode.SUBTRACT)
    extrude(amount=BOSS_EXTRUDE8_DEPTH)

    # Sketch27 → Boss-Extrude10 (add)
    with BuildSketch(Plane.XY.offset(-64)):
        with BuildLine():
            Line((-87.5, 97.409963118), (-87.5, 6.5))
            ThreePointArc((-87.5, 6.5), (-86.328427125, 3.671572875), (-83.5, 2.5))
            Line((-83.5, 2.5), (83.498076121, 2.5))
            ThreePointArc((83.498076121, 2.5), (86.327863634, 3.672136366), (87.5, 6.501923879))
            Line((87.5, 6.501923879), (87.5, 97.409963118))
            ThreePointArc((87.5, 97.409963118), (86.328427125, 100.238390242), (83.5, 101.409963118))
            Line((83.5, 101.409963118), (-83.5, 101.409963118))
            ThreePointArc((-83.5, 101.409963118), (-86.328427125, 100.238390242), (-87.5, 97.409963118))
        make_face()
        with BuildLine():
            Line((83.5, 98.409963118), (-83.5, 98.409963118))
            ThreePointArc((-83.5, 98.409963118), (-84.207106781, 98.117069899), (-84.5, 97.409963118))
            Line((-84.5, 97.409963118), (-84.5, 6.5))
            ThreePointArc((-84.5, 6.5), (-84.207106781, 5.792893219), (-83.5, 5.5))
            Line((-83.5, 5.5), (83.498076121, 5.5))
            ThreePointArc((83.498076121, 5.5), (84.20654329, 5.79345671), (84.5, 6.501923879))
            Line((84.5, 6.501923879), (84.5, 97.409963118))
            ThreePointArc((84.5, 97.409963118), (84.207106781, 98.117069899), (83.5, 98.409963118))
        make_face(mode=Mode.SUBTRACT)
    extrude(amount=BOSS_EXTRUDE10_DEPTH)

    # Boss-Extrude12 outline → Boss-Extrude12 (add)
    with BuildSketch(Plane.XY.offset(-60.5).offset(BOSS_EXTRUDE12_START)):
        with BuildLine():
            Line((82.5, 98.409963118), (82.5, 96.409963118))
            Line((82.5, 96.409963118), (84.5, 96.409963118))
            Line((84.5, 96.409963118), (84.5, 97.409963118))
            ThreePointArc((84.5, 97.409963118), (84.207106781, 98.117069899), (83.5, 98.409963118))
            Line((83.5, 98.409963118), (82.5, 98.409963118))
        make_face()
        with BuildLine():
            Line((84, 101.409963118), (83.5, 101.409963118))
            ThreePointArc((83.5, 101.409963118), (86.328427125, 100.238390242), (87.5, 97.409963118))
            Line((87.5, 97.409963118), (87.5, 97.909963118))
            ThreePointArc((87.5, 97.909963118), (86.474873734, 100.384836852), (84, 101.409963118))
        make_face()
    extrude(amount=BOSS_EXTRUDE12_DEPTH)

    # Sketch30 → Cut-Extrude21 (cut)
    with BuildSketch(Plane.XY.offset(-60.5)):
        Polygon((82.5, 96.409963118), (82.5, 98.409963118), (82, 98.409963118), (82, 104.702751436), (91.573615081, 104.702751436), (91.845206998, 95.909963118), (87.5, 95.909963118), (84.5, 95.909963118), (84.5, 96.409963118), align=None)
    extrude(amount=CUT_EXTRUDE21_DEPTH, mode=Mode.SUBTRACT)

    # Sketch31 → Cut-Extrude22 (cut)
    with BuildSketch(Plane.XY.offset(-60.5)):
        with Locations((85.55, 99.459963118)):
            Circle(SKETCH31_R)
    extrude(amount=-CUT_EXTRUDE22_DEPTH, mode=Mode.SUBTRACT)

    # Fillet11
    fillet11_edges = [part.edges().sort_by_distance(p)[0] for p in [
        (82.5, 96.409963118, -62.25),
    ]]
    fillet(fillet11_edges, radius=FILLET11_R)

    # Sketch32 → Cut-Extrude23 (cut)
    with BuildSketch(Plane(origin=(0, 0, -66), x_dir=(-1, 0, 0), z_dir=(0, 0, -1))):
        with Locations((65.847456736, 24.152543264)):
            Circle(SKETCH32_R)
    extrude(amount=-CUT_EXTRUDE23_DEPTH, mode=Mode.SUBTRACT)


solid = part.part
